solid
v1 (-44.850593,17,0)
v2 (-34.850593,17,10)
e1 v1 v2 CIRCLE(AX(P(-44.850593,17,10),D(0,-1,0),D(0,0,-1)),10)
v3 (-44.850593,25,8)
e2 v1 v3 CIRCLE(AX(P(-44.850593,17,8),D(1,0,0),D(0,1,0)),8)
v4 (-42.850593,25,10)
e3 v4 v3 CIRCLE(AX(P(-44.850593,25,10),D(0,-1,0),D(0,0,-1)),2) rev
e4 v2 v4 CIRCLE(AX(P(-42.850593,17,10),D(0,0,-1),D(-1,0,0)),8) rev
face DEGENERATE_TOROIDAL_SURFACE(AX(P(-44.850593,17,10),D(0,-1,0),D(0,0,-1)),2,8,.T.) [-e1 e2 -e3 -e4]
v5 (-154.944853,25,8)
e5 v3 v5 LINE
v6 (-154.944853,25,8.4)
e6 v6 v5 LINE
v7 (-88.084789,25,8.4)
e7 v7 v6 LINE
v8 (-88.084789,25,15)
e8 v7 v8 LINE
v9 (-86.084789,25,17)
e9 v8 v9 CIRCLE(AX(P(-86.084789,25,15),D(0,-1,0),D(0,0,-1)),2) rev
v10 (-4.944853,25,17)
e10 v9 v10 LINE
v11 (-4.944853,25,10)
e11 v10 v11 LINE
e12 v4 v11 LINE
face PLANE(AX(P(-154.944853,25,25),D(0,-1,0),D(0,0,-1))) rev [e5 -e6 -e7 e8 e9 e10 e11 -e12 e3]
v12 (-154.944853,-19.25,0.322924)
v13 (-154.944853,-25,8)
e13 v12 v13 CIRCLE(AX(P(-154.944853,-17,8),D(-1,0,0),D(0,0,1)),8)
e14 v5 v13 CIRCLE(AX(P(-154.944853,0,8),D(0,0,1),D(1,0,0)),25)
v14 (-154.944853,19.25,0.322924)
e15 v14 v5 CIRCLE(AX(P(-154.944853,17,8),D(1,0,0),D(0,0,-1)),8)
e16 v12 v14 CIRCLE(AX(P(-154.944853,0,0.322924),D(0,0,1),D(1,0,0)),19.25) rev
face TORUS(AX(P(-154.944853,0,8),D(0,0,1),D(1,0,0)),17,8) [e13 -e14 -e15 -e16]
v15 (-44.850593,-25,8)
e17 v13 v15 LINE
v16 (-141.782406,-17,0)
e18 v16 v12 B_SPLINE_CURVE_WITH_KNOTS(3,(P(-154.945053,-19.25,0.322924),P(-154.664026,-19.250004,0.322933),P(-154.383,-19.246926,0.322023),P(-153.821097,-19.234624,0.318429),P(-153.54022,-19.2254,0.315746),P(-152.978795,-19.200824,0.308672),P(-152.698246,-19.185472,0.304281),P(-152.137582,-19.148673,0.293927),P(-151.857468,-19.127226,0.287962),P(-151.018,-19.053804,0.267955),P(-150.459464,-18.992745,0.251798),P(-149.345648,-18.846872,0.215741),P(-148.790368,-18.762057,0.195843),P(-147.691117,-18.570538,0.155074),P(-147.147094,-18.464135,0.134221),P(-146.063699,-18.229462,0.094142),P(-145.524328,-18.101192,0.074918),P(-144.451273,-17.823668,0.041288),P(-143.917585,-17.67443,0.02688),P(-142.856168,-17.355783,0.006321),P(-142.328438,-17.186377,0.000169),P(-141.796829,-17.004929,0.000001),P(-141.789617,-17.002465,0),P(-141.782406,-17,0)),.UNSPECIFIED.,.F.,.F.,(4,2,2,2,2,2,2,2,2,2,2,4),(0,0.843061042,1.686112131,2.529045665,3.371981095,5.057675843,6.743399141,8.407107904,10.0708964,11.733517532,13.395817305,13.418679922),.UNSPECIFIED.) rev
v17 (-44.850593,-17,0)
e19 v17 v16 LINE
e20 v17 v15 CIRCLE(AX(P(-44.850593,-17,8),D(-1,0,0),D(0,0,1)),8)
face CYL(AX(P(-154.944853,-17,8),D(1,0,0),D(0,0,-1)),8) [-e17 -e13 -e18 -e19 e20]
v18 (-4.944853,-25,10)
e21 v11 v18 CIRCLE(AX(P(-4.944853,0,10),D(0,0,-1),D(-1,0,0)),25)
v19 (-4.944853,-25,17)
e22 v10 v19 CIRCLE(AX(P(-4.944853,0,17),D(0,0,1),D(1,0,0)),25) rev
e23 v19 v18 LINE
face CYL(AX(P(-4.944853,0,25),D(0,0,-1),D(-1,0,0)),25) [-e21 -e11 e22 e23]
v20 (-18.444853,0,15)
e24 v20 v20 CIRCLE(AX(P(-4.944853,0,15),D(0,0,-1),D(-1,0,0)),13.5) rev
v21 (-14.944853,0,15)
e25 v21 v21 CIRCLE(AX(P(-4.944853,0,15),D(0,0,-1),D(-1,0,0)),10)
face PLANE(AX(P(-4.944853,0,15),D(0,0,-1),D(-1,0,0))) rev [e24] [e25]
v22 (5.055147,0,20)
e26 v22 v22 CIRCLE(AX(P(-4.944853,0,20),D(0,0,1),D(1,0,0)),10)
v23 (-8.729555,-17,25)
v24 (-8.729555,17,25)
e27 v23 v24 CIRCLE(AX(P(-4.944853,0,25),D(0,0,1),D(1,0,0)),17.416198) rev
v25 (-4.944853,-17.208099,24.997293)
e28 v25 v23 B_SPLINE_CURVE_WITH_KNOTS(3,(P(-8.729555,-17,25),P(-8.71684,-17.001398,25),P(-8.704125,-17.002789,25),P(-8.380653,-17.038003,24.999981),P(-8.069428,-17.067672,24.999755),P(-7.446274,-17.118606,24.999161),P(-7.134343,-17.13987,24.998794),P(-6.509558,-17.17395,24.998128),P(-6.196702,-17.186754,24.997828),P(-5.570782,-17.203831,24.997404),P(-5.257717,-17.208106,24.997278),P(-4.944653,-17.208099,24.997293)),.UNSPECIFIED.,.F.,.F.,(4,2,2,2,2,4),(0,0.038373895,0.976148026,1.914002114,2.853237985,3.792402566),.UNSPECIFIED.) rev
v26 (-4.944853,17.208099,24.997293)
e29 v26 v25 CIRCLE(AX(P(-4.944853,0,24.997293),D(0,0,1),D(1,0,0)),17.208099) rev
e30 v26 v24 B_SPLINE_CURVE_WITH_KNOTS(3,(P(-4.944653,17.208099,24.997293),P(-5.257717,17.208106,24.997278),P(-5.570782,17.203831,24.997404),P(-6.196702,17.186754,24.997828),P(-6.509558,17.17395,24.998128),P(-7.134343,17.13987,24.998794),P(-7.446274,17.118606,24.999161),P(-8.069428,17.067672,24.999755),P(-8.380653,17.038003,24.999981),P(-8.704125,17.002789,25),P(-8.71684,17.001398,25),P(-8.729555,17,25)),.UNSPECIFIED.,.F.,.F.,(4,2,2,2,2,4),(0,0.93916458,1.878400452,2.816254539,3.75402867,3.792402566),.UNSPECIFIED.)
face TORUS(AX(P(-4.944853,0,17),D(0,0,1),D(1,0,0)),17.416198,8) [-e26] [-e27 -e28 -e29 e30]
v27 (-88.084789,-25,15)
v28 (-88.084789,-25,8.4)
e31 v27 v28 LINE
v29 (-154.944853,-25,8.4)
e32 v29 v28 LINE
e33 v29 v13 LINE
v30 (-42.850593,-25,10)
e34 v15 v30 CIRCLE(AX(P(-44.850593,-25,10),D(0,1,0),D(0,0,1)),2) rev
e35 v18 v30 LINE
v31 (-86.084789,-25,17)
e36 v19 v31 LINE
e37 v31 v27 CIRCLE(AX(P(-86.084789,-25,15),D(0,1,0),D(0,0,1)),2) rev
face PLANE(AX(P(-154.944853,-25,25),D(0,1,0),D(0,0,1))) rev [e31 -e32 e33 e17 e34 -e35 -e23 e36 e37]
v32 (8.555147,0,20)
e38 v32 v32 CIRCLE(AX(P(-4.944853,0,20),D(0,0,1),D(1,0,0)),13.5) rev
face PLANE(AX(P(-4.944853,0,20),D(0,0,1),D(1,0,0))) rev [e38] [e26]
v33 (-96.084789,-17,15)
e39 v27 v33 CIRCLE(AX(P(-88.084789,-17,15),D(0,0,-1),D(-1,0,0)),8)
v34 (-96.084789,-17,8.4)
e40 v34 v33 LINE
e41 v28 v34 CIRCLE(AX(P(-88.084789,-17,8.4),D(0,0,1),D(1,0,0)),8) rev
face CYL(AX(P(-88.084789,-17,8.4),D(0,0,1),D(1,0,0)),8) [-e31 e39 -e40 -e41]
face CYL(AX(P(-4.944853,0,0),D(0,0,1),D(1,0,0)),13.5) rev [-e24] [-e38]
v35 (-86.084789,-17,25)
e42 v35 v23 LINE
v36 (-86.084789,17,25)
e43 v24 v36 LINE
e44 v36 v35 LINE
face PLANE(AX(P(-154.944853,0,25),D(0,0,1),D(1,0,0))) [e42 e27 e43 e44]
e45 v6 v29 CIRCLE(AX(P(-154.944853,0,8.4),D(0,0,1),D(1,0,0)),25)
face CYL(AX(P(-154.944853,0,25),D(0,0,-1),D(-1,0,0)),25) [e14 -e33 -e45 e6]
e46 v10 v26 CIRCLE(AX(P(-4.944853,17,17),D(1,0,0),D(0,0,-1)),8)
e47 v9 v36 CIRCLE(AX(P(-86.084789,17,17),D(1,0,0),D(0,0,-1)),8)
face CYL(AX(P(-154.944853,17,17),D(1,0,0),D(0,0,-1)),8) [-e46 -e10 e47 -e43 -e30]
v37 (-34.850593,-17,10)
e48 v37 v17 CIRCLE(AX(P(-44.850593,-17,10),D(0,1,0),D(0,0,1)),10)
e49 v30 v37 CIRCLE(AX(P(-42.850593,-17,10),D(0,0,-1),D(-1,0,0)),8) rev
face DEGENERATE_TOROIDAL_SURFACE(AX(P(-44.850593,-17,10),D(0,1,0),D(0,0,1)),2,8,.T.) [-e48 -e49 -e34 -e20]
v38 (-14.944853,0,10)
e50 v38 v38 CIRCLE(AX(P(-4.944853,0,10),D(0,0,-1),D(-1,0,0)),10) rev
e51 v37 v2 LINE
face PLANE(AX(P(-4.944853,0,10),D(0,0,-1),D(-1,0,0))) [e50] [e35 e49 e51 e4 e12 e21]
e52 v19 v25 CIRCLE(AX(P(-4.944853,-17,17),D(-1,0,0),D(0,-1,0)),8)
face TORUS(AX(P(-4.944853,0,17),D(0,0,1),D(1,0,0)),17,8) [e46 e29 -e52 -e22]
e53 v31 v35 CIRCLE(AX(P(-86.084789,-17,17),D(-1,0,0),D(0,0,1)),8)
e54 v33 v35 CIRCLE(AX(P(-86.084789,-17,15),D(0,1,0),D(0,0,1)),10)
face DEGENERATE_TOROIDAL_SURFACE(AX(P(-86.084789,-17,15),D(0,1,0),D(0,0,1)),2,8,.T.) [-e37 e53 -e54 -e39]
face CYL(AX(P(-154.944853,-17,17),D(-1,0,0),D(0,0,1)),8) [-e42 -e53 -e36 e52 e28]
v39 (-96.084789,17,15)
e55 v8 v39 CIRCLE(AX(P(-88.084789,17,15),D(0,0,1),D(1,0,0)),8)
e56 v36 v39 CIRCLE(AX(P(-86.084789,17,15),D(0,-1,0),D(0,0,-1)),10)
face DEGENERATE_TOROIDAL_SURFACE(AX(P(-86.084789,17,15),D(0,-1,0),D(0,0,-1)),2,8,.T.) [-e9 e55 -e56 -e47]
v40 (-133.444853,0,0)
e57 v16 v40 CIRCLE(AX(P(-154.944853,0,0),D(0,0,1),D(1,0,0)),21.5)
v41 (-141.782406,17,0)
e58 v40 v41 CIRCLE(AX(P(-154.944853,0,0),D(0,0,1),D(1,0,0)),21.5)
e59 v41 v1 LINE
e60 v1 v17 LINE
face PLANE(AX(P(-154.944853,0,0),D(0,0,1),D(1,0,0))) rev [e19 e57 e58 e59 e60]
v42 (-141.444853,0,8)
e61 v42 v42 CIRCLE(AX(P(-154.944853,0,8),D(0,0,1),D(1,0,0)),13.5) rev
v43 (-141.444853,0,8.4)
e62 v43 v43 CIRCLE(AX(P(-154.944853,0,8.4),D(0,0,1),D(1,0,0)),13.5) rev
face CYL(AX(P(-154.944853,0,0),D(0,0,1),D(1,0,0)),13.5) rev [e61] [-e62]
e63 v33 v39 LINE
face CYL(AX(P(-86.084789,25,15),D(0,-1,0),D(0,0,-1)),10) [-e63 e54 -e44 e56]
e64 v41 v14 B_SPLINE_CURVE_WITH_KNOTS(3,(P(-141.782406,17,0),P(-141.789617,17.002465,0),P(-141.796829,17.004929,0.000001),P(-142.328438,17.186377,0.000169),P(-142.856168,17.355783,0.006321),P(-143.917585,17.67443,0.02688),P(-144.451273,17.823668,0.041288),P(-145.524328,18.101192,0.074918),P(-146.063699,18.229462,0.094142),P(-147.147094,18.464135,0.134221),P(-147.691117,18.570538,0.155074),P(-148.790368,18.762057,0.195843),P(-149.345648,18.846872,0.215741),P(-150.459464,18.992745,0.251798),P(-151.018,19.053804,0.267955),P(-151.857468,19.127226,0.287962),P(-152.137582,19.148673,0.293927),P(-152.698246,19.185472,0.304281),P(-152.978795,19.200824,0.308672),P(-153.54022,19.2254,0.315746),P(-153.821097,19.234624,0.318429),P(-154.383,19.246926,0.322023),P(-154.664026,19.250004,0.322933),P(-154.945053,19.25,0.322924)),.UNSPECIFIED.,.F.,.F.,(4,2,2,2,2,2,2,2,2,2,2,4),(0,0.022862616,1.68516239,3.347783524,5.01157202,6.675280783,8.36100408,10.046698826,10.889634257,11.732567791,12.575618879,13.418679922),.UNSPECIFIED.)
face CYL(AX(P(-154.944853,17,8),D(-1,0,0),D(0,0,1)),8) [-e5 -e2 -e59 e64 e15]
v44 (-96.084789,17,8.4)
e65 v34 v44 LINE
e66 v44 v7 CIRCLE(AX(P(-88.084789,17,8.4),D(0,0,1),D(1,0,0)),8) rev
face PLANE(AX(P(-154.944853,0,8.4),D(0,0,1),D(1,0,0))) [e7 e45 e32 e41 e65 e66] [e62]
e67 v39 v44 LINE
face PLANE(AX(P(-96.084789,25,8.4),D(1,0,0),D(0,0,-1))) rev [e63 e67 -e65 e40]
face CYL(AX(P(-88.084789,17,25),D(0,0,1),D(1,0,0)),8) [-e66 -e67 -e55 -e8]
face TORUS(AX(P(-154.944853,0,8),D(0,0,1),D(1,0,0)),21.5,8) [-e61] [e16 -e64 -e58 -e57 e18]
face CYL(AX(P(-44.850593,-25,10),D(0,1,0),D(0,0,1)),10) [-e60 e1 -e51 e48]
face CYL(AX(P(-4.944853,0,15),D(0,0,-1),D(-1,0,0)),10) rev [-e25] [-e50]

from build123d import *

# Parameters (mm, degrees)
BOSS_EXTRUDE1_DEPTH = 25
SKETCH2_R           = 13.5
CUT_EXTRUDE1_DEPTH  = 25
SKETCH3_R           = 13.5
CUT_EXTRUDE2_DEPTH  = 25
SKETCH4_R           = 13.5
SKETCH4_R_2         = 10
BOSS_EXTRUDE2_DEPTH = 5
BOSS_EXTRUDE3_START = -15
SKETCH5_R           = 13.5
SKETCH5_R_2         = 10
BOSS_EXTRUDE3_DEPTH = 15
CUT_EXTRUDE3_DEPTH  = 10
SKETCH7_R           = 13.468633883
BOSS_EXTRUDE4_DEPTH = 3
CUT_EXTRUDE4_START  = -16.6
CUT_EXTRUDE4_DEPTH  = 16.6
FILLET1_R           = 10
FILLET2_R           = 10
FILLET4_R           = 8


# Some blends are built 0.0001 mm under size
with BuildPart() as part:
    # Sketch1 → Boss-Extrude1 (new body)
    with BuildSketch(Plane.XY):
        with BuildLine():
            Line((-154.944852941, 25), (-4.944852941, 25))
            ThreePointArc((-4.944852941, 25), (20.055147059, 0), (-4.944852941, -25))
            Line((-4.944852941, -25), (-154.944852941, -25))
            ThreePointArc((-154.944852941, -25), (-179.944852941, 0), (-154.944852941, 25))
        make_face()
    extrude(amount=BOSS_EXTRUDE1_DEPTH)

    # Sketch2 → Cut-Extrude1 (cut)
    with BuildSketch(Plane.XY.offset(25)):
        with Locations((-4.944852941, 0)):
            Circle(SKETCH2_R)
    extrude(amount=-CUT_EXTRUDE1_DEPTH, mode=Mode.SUBTRACT)

    # Sketch3 → Cut-Extrude2 (cut)
    with BuildSketch(Plane.XY.offset(25)):
        with Locations((-154.944852941, 0)):
            Circle(SKETCH3_R)
    extrude(amount=-CUT_EXTRUDE2_DEPTH, mode=Mode.SUBTRACT)

    # Sketch4 → Boss-Extrude2 (add)
    with BuildSketch(Plane.XY.offset(25)):
        with Locations((-4.944852941, 0)):
            Circle(SKETCH4_R)
        with Locations((-4.944852941, 0)):
            Circle(SKETCH4_R_2, mode=Mode.SUBTRACT)
    extrude(amount=-BOSS_EXTRUDE2_DEPTH)

    # Sketch5 → Boss-Extrude3 (add)
    with BuildSketch(Plane(origin=(0, 0, 0), x_dir=(-1, 0, 0), z_dir=(0, 0, -1)).offset(BOSS_EXTRUDE3_START)):
        with Locations(Location((4.944852941, 0, 0), (0, 0, 180))):
            Circle(SKETCH5_R)
        with Locations(Location((4.944852941, 0, 0), (0, 0, 180))):
            Circle(SKETCH5_R_2, mode=Mode.SUBTRACT)
    extrude(amount=BOSS_EXTRUDE3_DEPTH)

    # Sketch6 → Cut-Extrude3 (cut)
    with BuildSketch(Plane(origin=(0, 0, 0), x_dir=(-1, 0, 0), z_dir=(0, 0, -1))):
        with BuildLine():
            Line((4.944852941, 25), (34.850592548, 25))
            Line((34.850592548, 25), (34.850592548, -25))
            Line((34.850592548, -25), (4.944852941, -25))
            ThreePointArc((4.944852941, -25), (-20.055147059, 0), (4.944852941, 25))
        make_face()
    extrude(amount=-CUT_EXTRUDE3_DEPTH, mode=Mode.SUBTRACT)


with BuildPart() as body_2:
    # Sketch7 → Boss-Extrude4 (new body)
    with BuildSketch(Plane.XY.offset(25)):
        with Locations((-154.944852941, 0)):
            Circle(SKETCH7_R)
    extrude(amount=-BOSS_EXTRUDE4_DEPTH)


with BuildPart() as cut_extrude4_tool:
    # Sketch9 → Cut-Extrude4 (new body)
    with BuildSketch(Plane.XY.offset(25).offset(CUT_EXTRUDE4_START)):
        with BuildLine():
            Line((-96.084788757, 25), (-96.084788757, -25))
            Line((-96.084788757, -25), (-154.944852941, -25))
            ThreePointArc((-154.944852941, -25), (-179.944852941, 0), (-154.944852941, 25))
            Line((-154.944852941, 25), (-96.084788757, 25))
        make_face()
    extrude(amount=CUT_EXTRUDE4_DEPTH)


with BuildPart() as part_1:
    add(part.part)

    # Cut-Extrude4: cut by cut_extrude4_tool
    add(cut_extrude4_tool.part, mode=Mode.SUBTRACT)

    # Fillet1
    fillet1_edges = [part_1.edges().sort_by_distance(p)[0] for p in [
        (-96.084788757, 0, 25),
    ]]
    fillet(fillet1_edges, radius=FILLET1_R)

    # Fillet2
    fillet2_edges = [part_1.edges().sort_by_distance(p)[0] for p in [
        (-34.850592548, 0, 0),
    ]]
    fillet(fillet2_edges, radius=FILLET2_R - 0.0001)  # a hair under: the kernel refuses the full size

    # Fillet4
    # the kernel refuses this fillet: 8 mm, written as the material it takes off along each edge
    with BuildSketch(Plane(origin=(-4.944852941, 0, 25), x_dir=(0, 1, 0), z_dir=(-1, 0, 0))) as fillet4_piece_1:
        with BuildLine():
            CenterArc((25 - FILLET4_R, FILLET4_R), FILLET4_R, 270, 90)
            Line((25 - FILLET4_R, 0), (25, 0))
            Line((25, 0), (25, FILLET4_R))
        make_face()
    revolve(axis=Axis((-4.944852941, 0, 25), (0, 0, -1)), revolution_arc=180, mode=Mode.SUBTRACT)
    with BuildSketch(Plane(origin=(-86.084788757, 25, 25), x_dir=(0, -1, 0), z_dir=(1, 0, 0))) as fillet4_piece_2:
        with BuildLine():
            CenterArc((FILLET4_R, FILLET4_R), FILLET4_R, 180, 90)
            Line((0, FILLET4_R), (0, 0))
            Line((0, 0), (FILLET4_R, 0))
        make_face()
    extrude(amount=81.139935816, mode=Mode.SUBTRACT)
    with BuildSketch(Plane(origin=(-154.944852941, 0, 0), x_dir=(1, 0, 0), z_dir=(0, -1, 0))) as fillet4_piece_3:
        with BuildLine():
            CenterArc((13.5 + FILLET4_R, FILLET4_R), FILLET4_R, 180, 90)
            Line((13.5, FILLET4_R), (13.5, 0))
            Line((13.5, 0), (13.5 + FILLET4_R, 0))
        make_face()
    revolve(axis=Axis((-154.944852941, 0, 0), (0, 0, 1)), mode=Mode.SUBTRACT)
    with BuildSketch(Plane(origin=(-4.944852941, 0, 25), x_dir=(1, 0, 0), z_dir=(0, -1, 0))) as fillet4_piece_4:
        with BuildLine():
            CenterArc((17.416198487, -8), FILLET4_R, 90, 67.975687163)
            Line((10, -5), (10, 0))
            Line((10, 0), (17.416198487, 0))
        make_face()
    revolve(axis=Axis((-4.944852941, 0, 25), (0, 0, 1)), mode=Mode.SUBTRACT)
    with BuildSketch(Plane(origin=(-44.850492548, -25, 0), x_dir=(0, 0, 1), z_dir=(-1, 0, 0))) as fillet4_piece_5:
        with BuildLine():
            CenterArc((FILLET4_R, FILLET4_R), FILLET4_R, 180, 90)
            Line((0, FILLET4_R), (0, 0))
            Line((0, 0), (FILLET4_R, 0))
        make_face()
    extrude(amount=110.094360393, mode=Mode.SUBTRACT)
    with BuildSketch(Plane(origin=(-154.944852941, 0, 0), x_dir=(0, -1, 0), z_dir=(1, 0, 0))) as fillet4_piece_6:
        with BuildLine():
            CenterArc((25 - FILLET4_R, -FILLET4_R), FILLET4_R, 0, 90)
            Line((25, -FILLET4_R), (25, 0))
            Line((25, 0), (25 - FILLET4_R, 0))
        make_face()
    revolve(axis=Axis((-154.944852941, 0, 0), (0, 0, -1)), revolution_arc=180, mode=Mode.SUBTRACT)
    with BuildSketch(Plane(origin=(-96.084788757, 25, 8.4), x_dir=(0, -1, 0), z_dir=(0, 0, 1)), Plane(origin=(-96.084788757, -25, 8.4), x_dir=(1, 0, 0), z_dir=(0, 0, 1))) as fillet4_piece_7:
        with BuildLine():
            CenterArc((FILLET4_R, FILLET4_R), FILLET4_R, 180, 90)
            Line((0, FILLET4_R), (0, 0))
            Line((0, 0), (FILLET4_R, 0))
        make_face()
    extrude(amount=6.6, mode=Mode.SUBTRACT)
    with BuildSketch(Plane(origin=(-86.084788757, 25, 15), x_dir=(-1, 0, 0), z_dir=(0, 0, -1))) as fillet4_piece_8:
        with BuildLine():
            CenterArc((10 - FILLET4_R, -FILLET4_R), FILLET4_R, 0, 90)
            Line((10 - FILLET4_R, 0), (10, 0))
            Line((10, 0), (10, -FILLET4_R))
        make_face()
    revolve(axis=Axis((-86.084788757, 25, 15), (0, 1, 0)), revolution_arc=90, mode=Mode.SUBTRACT)
    with BuildSketch(Plane(origin=(-4.944852941, -25, 25), x_dir=(0, 0, -1), z_dir=(-1, 0, 0))) as fillet4_piece_9:
        with BuildLine():
            CenterArc((FILLET4_R, -FILLET4_R), FILLET4_R, 90, 90)
            Line((0, -FILLET4_R), (0, 0))
            Line((0, 0), (FILLET4_R, 0))
        make_face()
    extrude(amount=81.139935816, mode=Mode.SUBTRACT)
    with BuildSketch(Plane(origin=(-86.084788757, -25, 15), x_dir=(-1, 0, 0), z_dir=(0, 0, -1))) as fillet4_piece_10:
        with BuildLine():
            CenterArc((10 - FILLET4_R, FILLET4_R), FILLET4_R, 270, 90)
            Line((10, FILLET4_R), (10, 0))
            Line((10, 0), (10 - FILLET4_R, 0))
        make_face()
    revolve(axis=Axis((-86.084788757, -25, 15), (0, 1, 0)), revolution_arc=90, mode=Mode.SUBTRACT)
    with BuildSketch(Plane(origin=(-154.944852941, 25, 0), x_dir=(0, -1, 0), z_dir=(1, 0, 0))) as fillet4_piece_11:
        with BuildLine():
            CenterArc((FILLET4_R, -FILLET4_R), FILLET4_R, 90, 90)
            Line((0, -FILLET4_R), (0, 0))
            Line((0, 0), (FILLET4_R, 0))
        make_face()
    extrude(amount=110.094360393, mode=Mode.SUBTRACT)
    with BuildSketch(Plane(origin=(-44.850492548, 25, 9.9999), x_dir=(0, 0, -1), z_dir=(-1, 0, 0))) as fillet4_piece_12:
        with BuildLine():
            CenterArc((9.9999 - FILLET4_R, FILLET4_R), FILLET4_R, 270, 90)
            Line((9.9999 - FILLET4_R, 0), (9.9999, 0))
            Line((9.9999, 0), (9.9999, FILLET4_R))
        make_face()
    revolve(axis=Axis((-44.850492548, 25, 9.9999), (0, -1, 0)), revolution_arc=90, mode=Mode.SUBTRACT)
    with BuildSketch(Plane(origin=(-44.850492548, -25, 9.9999), x_dir=(0, 0, -1), z_dir=(-1, 0, 0))) as fillet4_piece_13:
        with BuildLine():
            CenterArc((9.9999 - FILLET4_R, -FILLET4_R), FILLET4_R, 0, 90)
            Line((9.9999, -FILLET4_R), (9.9999, 0))
            Line((9.9999, 0), (9.9999 - FILLET4_R, 0))
        make_face()
    revolve(axis=Axis((-44.850492548, -25, 9.9999), (0, -1, 0)), revolution_arc=90, mode=Mode.SUBTRACT)
    with BuildSketch(Plane(origin=(-34.850592548, -25, 9.9999), x_dir=(-1, 0, 0), z_dir=(0, 0, 1)), Plane(origin=(-34.850592548, 25, 9.9999), x_dir=(0, -1, 0), z_dir=(0, 0, 1))) as fillet4_piece_14:
        with BuildLine():
            CenterArc((FILLET4_R, -FILLET4_R), FILLET4_R, 90, 90)
            Line((0, -FILLET4_R), (0, 0))
            Line((0, 0), (FILLET4_R, 0))
        make_face()
    extrude(amount=0.0001, mode=Mode.SUBTRACT)


with BuildPart() as body_2_1:
    add(body_2.part)

    # Cut-Extrude4: cut by cut_extrude4_tool
    add(cut_extrude4_tool.part, mode=Mode.SUBTRACT)


solid = part_1.part
